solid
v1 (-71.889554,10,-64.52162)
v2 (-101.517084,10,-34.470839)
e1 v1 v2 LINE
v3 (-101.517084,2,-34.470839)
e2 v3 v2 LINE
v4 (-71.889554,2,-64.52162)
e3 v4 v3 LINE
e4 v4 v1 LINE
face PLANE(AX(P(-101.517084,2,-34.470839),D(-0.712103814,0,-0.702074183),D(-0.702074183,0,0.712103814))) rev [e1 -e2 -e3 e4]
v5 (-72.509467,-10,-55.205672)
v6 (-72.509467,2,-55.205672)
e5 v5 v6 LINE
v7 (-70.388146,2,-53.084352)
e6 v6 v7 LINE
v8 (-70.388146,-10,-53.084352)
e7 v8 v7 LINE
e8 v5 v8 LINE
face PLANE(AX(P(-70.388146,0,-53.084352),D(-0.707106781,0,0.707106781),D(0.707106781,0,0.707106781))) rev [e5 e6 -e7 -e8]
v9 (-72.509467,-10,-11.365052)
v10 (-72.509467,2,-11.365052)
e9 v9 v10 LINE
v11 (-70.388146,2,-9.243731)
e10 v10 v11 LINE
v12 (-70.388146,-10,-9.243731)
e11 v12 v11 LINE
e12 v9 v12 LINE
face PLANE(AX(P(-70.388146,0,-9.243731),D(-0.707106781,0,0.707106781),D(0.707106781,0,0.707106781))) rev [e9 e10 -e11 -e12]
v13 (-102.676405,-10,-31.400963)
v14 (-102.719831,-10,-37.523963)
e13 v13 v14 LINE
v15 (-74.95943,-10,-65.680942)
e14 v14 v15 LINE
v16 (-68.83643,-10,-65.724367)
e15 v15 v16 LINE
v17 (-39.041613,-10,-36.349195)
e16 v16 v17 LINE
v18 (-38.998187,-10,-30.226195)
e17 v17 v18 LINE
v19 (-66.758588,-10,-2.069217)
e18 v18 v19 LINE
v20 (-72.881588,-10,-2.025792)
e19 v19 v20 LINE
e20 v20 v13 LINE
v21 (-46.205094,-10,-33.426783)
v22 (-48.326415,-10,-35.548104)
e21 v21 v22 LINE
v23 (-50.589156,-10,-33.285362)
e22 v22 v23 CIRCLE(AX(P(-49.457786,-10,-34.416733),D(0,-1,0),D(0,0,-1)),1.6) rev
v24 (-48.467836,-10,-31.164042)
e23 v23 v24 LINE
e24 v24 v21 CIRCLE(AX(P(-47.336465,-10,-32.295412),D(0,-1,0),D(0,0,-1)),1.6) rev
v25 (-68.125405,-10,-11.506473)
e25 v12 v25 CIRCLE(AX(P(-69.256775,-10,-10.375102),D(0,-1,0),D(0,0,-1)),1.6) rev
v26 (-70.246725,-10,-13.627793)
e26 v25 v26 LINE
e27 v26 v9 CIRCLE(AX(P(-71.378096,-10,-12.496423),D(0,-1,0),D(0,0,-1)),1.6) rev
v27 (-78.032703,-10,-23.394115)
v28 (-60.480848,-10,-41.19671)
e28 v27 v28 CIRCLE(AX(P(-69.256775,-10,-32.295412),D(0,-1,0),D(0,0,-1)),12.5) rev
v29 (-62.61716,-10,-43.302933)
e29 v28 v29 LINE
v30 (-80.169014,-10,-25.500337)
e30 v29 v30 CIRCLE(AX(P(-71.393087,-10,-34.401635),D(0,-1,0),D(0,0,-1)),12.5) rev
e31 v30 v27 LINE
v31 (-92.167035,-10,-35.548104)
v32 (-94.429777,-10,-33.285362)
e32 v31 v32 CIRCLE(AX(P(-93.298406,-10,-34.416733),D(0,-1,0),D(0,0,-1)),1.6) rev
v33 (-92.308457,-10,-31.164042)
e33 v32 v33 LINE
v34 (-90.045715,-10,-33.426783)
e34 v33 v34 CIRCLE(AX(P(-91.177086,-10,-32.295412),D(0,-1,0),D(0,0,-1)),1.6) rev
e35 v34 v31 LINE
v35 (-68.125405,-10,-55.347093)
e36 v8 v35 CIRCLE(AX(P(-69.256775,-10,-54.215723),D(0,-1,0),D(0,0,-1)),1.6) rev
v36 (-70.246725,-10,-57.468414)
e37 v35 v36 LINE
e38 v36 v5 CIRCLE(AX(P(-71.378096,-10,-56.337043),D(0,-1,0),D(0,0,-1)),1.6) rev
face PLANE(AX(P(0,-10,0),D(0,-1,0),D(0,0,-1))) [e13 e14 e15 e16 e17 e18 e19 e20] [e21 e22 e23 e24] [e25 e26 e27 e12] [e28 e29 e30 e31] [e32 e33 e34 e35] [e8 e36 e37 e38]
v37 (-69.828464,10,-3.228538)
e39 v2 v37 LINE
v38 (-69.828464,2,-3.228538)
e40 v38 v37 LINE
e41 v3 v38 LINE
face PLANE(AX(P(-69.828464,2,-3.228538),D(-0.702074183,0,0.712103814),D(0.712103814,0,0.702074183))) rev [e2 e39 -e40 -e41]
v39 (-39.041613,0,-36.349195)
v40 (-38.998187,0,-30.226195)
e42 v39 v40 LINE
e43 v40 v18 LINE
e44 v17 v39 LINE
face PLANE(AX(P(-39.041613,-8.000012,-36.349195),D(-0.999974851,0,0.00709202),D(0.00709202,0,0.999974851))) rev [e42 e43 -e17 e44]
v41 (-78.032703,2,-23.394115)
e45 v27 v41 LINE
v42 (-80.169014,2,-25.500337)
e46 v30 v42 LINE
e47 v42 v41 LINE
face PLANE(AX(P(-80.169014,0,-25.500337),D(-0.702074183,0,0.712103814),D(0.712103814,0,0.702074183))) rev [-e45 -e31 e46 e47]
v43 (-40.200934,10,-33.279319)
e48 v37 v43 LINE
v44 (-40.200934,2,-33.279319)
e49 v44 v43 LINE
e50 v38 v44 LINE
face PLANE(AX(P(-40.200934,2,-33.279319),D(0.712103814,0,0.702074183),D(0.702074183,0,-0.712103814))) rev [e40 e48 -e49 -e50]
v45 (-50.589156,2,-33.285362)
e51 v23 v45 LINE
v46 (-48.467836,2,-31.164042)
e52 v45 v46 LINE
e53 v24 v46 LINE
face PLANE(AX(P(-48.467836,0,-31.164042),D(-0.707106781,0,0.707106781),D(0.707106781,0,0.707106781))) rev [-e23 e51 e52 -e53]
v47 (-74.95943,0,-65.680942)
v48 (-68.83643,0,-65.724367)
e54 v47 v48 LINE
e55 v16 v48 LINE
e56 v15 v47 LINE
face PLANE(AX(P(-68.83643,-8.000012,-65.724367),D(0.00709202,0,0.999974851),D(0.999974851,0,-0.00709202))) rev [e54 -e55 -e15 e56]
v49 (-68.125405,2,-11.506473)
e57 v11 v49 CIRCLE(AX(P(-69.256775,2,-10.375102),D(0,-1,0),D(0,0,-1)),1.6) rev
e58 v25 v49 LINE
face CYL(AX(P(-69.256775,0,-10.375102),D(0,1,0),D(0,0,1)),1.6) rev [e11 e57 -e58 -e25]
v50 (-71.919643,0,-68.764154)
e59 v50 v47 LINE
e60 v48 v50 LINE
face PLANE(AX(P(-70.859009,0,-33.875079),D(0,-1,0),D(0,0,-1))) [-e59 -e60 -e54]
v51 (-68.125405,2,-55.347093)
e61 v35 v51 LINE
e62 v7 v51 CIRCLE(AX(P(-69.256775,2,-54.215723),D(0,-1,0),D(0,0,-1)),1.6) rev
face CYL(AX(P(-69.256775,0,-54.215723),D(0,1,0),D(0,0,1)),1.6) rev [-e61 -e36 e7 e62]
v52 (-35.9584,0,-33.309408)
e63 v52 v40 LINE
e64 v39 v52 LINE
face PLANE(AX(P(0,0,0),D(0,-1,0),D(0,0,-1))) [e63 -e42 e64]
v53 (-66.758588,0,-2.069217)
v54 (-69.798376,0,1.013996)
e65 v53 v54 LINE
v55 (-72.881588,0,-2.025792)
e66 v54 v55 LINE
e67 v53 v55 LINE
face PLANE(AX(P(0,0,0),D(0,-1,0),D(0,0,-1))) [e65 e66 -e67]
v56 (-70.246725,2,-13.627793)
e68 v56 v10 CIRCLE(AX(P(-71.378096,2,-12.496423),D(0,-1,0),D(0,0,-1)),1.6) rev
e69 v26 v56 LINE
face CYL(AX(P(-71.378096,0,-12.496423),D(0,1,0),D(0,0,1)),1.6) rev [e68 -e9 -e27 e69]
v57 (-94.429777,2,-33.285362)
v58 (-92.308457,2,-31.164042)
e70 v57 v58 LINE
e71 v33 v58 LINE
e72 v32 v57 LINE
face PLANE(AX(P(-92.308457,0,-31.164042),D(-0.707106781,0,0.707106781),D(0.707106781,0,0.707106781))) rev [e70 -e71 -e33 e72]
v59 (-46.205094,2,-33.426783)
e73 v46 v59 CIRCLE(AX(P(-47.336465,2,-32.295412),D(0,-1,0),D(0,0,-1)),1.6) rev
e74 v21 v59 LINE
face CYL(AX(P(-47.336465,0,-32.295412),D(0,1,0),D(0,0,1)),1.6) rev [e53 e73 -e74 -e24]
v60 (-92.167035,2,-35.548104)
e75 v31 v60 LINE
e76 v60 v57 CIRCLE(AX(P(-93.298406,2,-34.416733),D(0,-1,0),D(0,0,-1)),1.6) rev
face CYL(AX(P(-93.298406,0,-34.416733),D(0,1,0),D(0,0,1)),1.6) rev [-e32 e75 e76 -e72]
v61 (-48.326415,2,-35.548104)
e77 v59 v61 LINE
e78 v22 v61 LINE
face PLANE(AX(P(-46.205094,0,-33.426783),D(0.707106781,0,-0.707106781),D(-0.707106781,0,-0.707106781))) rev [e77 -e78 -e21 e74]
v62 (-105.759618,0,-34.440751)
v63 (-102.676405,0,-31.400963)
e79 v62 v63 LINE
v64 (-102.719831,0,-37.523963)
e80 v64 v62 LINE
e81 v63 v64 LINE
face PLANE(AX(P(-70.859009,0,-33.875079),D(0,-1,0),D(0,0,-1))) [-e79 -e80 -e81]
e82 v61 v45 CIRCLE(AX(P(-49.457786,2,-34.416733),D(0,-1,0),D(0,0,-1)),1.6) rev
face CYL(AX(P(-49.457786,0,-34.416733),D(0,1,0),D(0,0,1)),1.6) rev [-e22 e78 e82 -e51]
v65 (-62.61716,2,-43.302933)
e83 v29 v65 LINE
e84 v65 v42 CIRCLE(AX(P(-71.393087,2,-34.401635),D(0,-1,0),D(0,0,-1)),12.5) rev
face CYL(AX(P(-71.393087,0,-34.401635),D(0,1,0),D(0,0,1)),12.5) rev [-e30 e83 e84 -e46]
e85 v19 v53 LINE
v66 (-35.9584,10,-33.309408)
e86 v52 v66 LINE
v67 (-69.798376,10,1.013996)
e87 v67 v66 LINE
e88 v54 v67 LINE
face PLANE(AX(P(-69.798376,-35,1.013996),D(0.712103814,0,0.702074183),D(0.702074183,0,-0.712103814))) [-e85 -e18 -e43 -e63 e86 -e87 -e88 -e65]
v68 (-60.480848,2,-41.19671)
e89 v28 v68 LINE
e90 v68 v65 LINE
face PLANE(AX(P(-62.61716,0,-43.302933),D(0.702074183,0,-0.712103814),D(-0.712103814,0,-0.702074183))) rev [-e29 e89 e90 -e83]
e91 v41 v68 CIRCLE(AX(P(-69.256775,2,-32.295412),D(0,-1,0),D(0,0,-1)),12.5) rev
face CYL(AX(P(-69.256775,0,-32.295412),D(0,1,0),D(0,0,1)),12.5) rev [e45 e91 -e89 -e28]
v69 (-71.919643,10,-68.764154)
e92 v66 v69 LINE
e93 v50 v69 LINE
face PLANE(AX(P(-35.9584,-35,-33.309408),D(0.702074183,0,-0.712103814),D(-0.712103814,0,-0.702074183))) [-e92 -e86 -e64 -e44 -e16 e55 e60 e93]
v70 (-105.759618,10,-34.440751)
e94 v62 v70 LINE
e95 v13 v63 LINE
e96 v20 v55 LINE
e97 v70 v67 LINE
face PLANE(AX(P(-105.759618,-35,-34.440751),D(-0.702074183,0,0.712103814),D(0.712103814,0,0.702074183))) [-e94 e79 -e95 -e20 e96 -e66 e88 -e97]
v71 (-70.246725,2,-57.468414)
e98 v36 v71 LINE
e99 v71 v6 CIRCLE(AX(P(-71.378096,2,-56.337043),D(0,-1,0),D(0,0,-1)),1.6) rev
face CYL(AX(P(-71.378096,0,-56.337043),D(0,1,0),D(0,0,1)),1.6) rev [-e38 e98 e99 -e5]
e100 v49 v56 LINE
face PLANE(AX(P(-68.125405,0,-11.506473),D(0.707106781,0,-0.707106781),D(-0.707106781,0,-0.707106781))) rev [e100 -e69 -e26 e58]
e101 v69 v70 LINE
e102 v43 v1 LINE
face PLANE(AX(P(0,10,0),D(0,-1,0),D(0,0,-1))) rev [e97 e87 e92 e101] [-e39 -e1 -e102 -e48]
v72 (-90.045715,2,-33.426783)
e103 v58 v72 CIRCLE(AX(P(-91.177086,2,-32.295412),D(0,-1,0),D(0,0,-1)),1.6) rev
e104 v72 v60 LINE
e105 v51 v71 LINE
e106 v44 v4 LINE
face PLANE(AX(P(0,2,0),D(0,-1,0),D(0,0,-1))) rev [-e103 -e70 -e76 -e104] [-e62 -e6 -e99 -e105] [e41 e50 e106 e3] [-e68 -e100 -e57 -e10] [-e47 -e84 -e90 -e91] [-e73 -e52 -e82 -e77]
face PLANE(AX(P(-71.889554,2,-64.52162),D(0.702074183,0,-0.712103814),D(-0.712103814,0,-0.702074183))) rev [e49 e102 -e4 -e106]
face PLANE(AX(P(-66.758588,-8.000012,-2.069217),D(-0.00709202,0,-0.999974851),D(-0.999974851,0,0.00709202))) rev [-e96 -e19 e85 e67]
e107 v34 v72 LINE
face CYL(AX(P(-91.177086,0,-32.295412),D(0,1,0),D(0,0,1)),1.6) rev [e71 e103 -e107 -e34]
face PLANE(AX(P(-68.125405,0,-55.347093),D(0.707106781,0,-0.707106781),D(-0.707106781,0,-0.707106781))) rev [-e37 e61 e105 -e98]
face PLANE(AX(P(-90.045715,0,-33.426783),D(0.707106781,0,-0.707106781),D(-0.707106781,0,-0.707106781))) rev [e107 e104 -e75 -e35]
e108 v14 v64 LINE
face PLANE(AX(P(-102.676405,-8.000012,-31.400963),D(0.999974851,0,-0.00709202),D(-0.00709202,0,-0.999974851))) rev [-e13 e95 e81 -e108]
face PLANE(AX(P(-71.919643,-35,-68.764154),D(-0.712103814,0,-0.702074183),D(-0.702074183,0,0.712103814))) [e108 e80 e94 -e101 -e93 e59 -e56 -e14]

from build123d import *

# Parameters (mm, degrees)
SKETCH1_W                  = 215
SKETCH1_H                  = 140
BOSS_EXTRUDE1_DEPTH        = 10
FILLET1_R                  = 60
SKETCH2_R                  = 20
SKETCH2_R_2                = 7.5
CUT_EXTRUDE1_DEPTH         = 129.671092325
CUT_EXTRUDE2_DEPTH         = 129.671092325
CUT_EXTRUDE3_DEPTH         = 129.671092325
SKETCH5_R                  = 11
CUT_EXTRUDE4_DEPTH         = 7
SKETCH6_R                  = 14
SKETCH6_R_2                = 11
BOSS_EXTRUDE2_DEPTH        = 8.5
SKETCH7_R                  = 23.5
CUT_EXTRUDE5_DEPTH         = 7
SKETCH8_R                  = 38.5
SKETCH8_R_2                = 30.5
BOSS_EXTRUDE3_DEPTH        = 8
BOSS_EXTRUDE4_DEPTH        = 35
BOSS_EXTRUDE5_DEPTH        = 8
CUT_EXTRUDE6_DEPTH         = 8
SKETCH12_R                 = 11
SKETCH12_R_2               = 7.5
BOSS_EXTRUDE6_DEPTH        = 0.5
BOSS_EXTRUDE7_REACH        = 137.946
SKETCH14_R                 = 2.05
CUT_EXTRUDE7_DEPTH         = 3.6
BOSS_EXTRUDE8_REACH        = 137.946
SKETCH16_R                 = 2.05
CUT_EXTRUDE8_START         = -3.6
CUT_EXTRUDE8_OUTLINE_R     = 2.05
CUT_EXTRUDE8_DEPTH         = 3.6
LPATTERN1_COUNT            = 3
LPATTERN1_PITCH            = 55
MIRROR2_COPY_1_REACH       = 137.946
MIRROR2_COPY_1_SKETCH_R    = 2.05
MIRROR2_COPY_2_REACH       = 137.946
MIRROR2_COPY_2_SKETCH_R    = 2.05
MIRROR2_START              = -3.6
MIRROR2_COPY_3_SKETCH_R    = 2.05
MIRROR2_COPY_3_DEPTH       = 3.6
MIRROR2_COPY_4_SKETCH_R    = 2.05
MIRROR2_COPY_4_DEPTH       = 3.6
BOSS_EXTRUDE9_REACH        = 137.946
SKETCH18_R                 = 2.05
CUT_EXTRUDE9_DEPTH         = 3.6
BOSS_EXTRUDE10_DEPTH       = 8
CUT_EXTRUDE10_DEPTH        = 133.97086147
SKETCH22_R                 = 1.6
CUT_EXTRUDE11_DEPTH        = 133.97086147
SKETCH23_R                 = 2.05
CUT_EXTRUDE12_DEPTH        = 133.97086147
CUT_EXTRUDE13_REACH        = 230.801
SKETCH24_R                 = 2.05
CROQUIS1_OUTSIDE_W         = 269.096
CROQUIS1_OUTSIDE_H         = 194.096
CORTAR_EXTRUIR1_DEPTH      = 136.945761243
CORTAR_EXTRUIR2_DEPTH      = 131.754479901
CORTAR_EXTRUIR2_DEPTH_BACK = 131.754479901
CROQUIS2_OUTSIDE_W         = 122.389
CROQUIS2_OUTSIDE_H         = 68.694
CROQUIS2_OUTSIDE_W_2       = 50.5
CROQUIS2_OUTSIDE_H_2       = 18
CORTAR_EXTRUIR3_DEPTH      = 128.426864322
CORTAR_EXTRUIR3_DEPTH_BACK = 8
CROQUIS3_OUTSIDE_W         = 91.868
CROQUIS3_OUTSIDE_H         = 91.844
SALIENTE_EXTRUIR1_DEPTH    = 2


# Read off the part's stored shape, not the designer's step: Cut-Extrude8
with BuildPart() as part:
    # Sketch1 → Boss-Extrude1 (new body)
    with BuildSketch(Plane(origin=(0, 0, 0), x_dir=(1, 0, 0), z_dir=(0, 1, 0))):
        Rectangle(SKETCH1_W, SKETCH1_H)
    extrude(amount=BOSS_EXTRUDE1_DEPTH)

    # Fillet1
    fillet1_edges = [part.edges().sort_by_distance(p)[0] for p in [
        (107.5, 5, 70),
        (107.5, 5, -70),
    ]]
    fillet(fillet1_edges, radius=FILLET1_R)

    # Sketch2 → Cut-Extrude1 (cut, through all)
    with BuildSketch(Plane(origin=(0, 10, 0), x_dir=(1, 0, 0), z_dir=(0, 1, 0))):
        with Locations(Location((42.5, 0, 0), (0, 0, 270))):
            Circle(SKETCH2_R)
        with Locations(Location((-36.5, 0, 0), (0, 0, 270))):
            Circle(SKETCH2_R_2)
    extrude(amount=-CUT_EXTRUDE1_DEPTH, mode=Mode.SUBTRACT)

    # Sketch3 → Cut-Extrude2 (cut, through all)
    with BuildSketch(Plane(origin=(0, 10, 0), x_dir=(1, 0, 0), z_dir=(0, 1, 0))):
        with BuildLine():
            Line((-62.6171596, 43.302932631), (-60.480848158, 41.196710083))
            ThreePointArc((-60.480848158, 41.196710083), (-60.355477768, 23.519485123), (-78.032702727, 23.394114734))
            Line((-78.032702727, 23.394114734), (-80.169014169, 25.500337282))
            ThreePointArc((-80.169014169, 25.500337282), (-80.294384559, 43.177562241), (-62.6171596, 43.302932631))
        make_face()
    extrude(amount=-CUT_EXTRUDE2_DEPTH, mode=Mode.SUBTRACT)

    # Sketch4 → Cut-Extrude3 (cut, through all)
    with BuildSketch(Plane(origin=(0, 10, 0), x_dir=(1, 0, 0), z_dir=(0, 1, 0))):
        with BuildLine():
            Line((-48.467836076, 31.164041558), (-50.589156419, 33.285361902))
            ThreePointArc((-50.589156419, 33.285361902), (-50.589156419, 35.548103602), (-48.326414719, 35.548103602))
            Line((-48.326414719, 35.548103602), (-46.205094376, 33.426783258))
            ThreePointArc((-46.205094376, 33.426783258), (-46.205094376, 31.164041558), (-48.467836076, 31.164041558))
        make_face()
        with BuildLine():
            Line((-70.388146292, 53.084351775), (-72.509466636, 55.205672119))
            ThreePointArc((-72.509466636, 55.205672119), (-72.509466636, 57.468413818), (-70.246724936, 57.468413818))
            Line((-70.246724936, 57.468413818), (-68.125404593, 55.347093475))
            ThreePointArc((-68.125404593, 55.347093475), (-68.125404593, 53.084351775), (-70.388146292, 53.084351775))
        make_face()
        with BuildLine():
            Line((-70.388146292, 9.243731341), (-72.509466636, 11.365051685))
            ThreePointArc((-72.509466636, 11.365051685), (-72.509466636, 13.627793385), (-70.246724936, 13.627793385))
            Line((-70.246724936, 13.627793385), (-68.125404593, 11.506473041))
            ThreePointArc((-68.125404593, 11.506473041), (-68.125404593, 9.243731341), (-70.388146292, 9.243731341))
        make_face()
        with BuildLine():
            Line((-92.308456509, 31.164041558), (-94.429776853, 33.285361902))
            ThreePointArc((-94.429776853, 33.285361902), (-94.429776853, 35.548103602), (-92.167035153, 35.548103602))
            Line((-92.167035153, 35.548103602), (-90.045714809, 33.426783258))
            ThreePointArc((-90.045714809, 33.426783258), (-90.045714809, 31.164041558), (-92.308456509, 31.164041558))
        make_face()
    extrude(amount=-CUT_EXTRUDE3_DEPTH, mode=Mode.SUBTRACT)

    # Sketch5 → Cut-Extrude4 (cut)
    with BuildSketch(Plane(origin=(0, 10, 0), x_dir=(1, 0, 0), z_dir=(0, 1, 0))):
        with Locations(Location((-36.5, 0, 0), (0, 0, 270))):
            Circle(SKETCH5_R)
    extrude(amount=-CUT_EXTRUDE4_DEPTH, mode=Mode.SUBTRACT)

    # Sketch6 → Boss-Extrude2 (add)
    with BuildSketch(Plane.XZ):
        with Locations(Location((-36.5, 0, 0), (0, 0, 270))):
            Circle(SKETCH6_R)
        with Locations(Location((-36.5, 0, 0), (0, 0, 90))):
            Circle(SKETCH6_R_2, mode=Mode.SUBTRACT)
    extrude(amount=BOSS_EXTRUDE2_DEPTH)

    # Sketch7 → Cut-Extrude5 (cut)
    with BuildSketch(Plane.XZ):
        with Locations(Location((42.5, 0, 0), (0, 0, 270))):
            Circle(SKETCH7_R)
    extrude(amount=-CUT_EXTRUDE5_DEPTH, mode=Mode.SUBTRACT)

    # Sketch8 → Boss-Extrude3 (add)
    with BuildSketch(Plane.XZ):
        with Locations(Location((42.5, 0, 0), (0, 0, 270))):
            Circle(SKETCH8_R)
        with Locations(Location((42.5, 0, 0), (0, 0, 270))):
            Circle(SKETCH8_R_2, mode=Mode.SUBTRACT)
    extrude(amount=BOSS_EXTRUDE3_DEPTH)

    # Sketch9 → Boss-Extrude4 (add)
    with BuildSketch(Plane.XZ):
        with BuildLine():
            Line((-107.5, -70), (47.5, -70))
            ThreePointArc((47.5, -70), (89.926406871, -52.426406871), (107.5, -10))
            Line((107.5, -10), (107.5, 10))
            ThreePointArc((107.5, 10), (89.926406871, 52.426406871), (47.5, 70))
            Line((47.5, 70), (-107.5, 70))
            Line((-107.5, 70), (-107.5, -70))
        make_face()
        with BuildLine():
            Line((47.5, 62), (-99.5, 62))
            Line((-99.5, 62), (-99.5, -62))
            Line((-99.5, -62), (47.5, -62))
            ThreePointArc((47.5, -62), (84.269552622, -46.769552622), (99.5, -10))
            Line((99.5, -10), (99.5, 10))
            ThreePointArc((99.5, 10), (84.269552622, 46.769552622), (47.5, 62))
        make_face(mode=Mode.SUBTRACT)
    extrude(amount=BOSS_EXTRUDE4_DEPTH)

    # Sketch10 → Boss-Extrude5 (add)
    with BuildSketch(Plane.XZ):
        with BuildLine():
            Line((-36.5, -14), (-36.5, -62))
            Line((-36.5, -62), (-99.5, -62))
            Line((-99.5, -62), (-99.5, 0))
            Line((-99.5, 0), (-50.5, 0))
            ThreePointArc((-50.5, 0), (-46.399494937, -9.899494937), (-36.5, -14))
        make_face()
        with BuildLine():
            Line((-80.169014169, -25.500337282), (-78.032702727, -23.394114734))
            ThreePointArc((-78.032702727, -23.394114734), (-60.355477768, -23.519485123), (-60.480848158, -41.196710083))
            Line((-60.480848158, -41.196710083), (-62.6171596, -43.302932631))
            ThreePointArc((-62.6171596, -43.302932631), (-80.294384559, -43.177562241), (-80.169014169, -25.500337282))
        make_face(mode=Mode.SUBTRACT)
        with BuildLine():
            Line((-94.429776853, -33.285361902), (-92.308456509, -31.164041558))
            ThreePointArc((-92.308456509, -31.164041558), (-90.045714809, -31.164041558), (-90.045714809, -33.426783258))
            Line((-90.045714809, -33.426783258), (-92.167035153, -35.548103602))
            ThreePointArc((-92.167035153, -35.548103602), (-94.429776853, -35.548103602), (-94.429776853, -33.285361902))
        make_face(mode=Mode.SUBTRACT)
        with BuildLine():
            Line((-68.125404593, -55.347093475), (-70.246724936, -57.468413818))
            ThreePointArc((-70.246724936, -57.468413818), (-72.509466636, -57.468413818), (-72.509466636, -55.205672119))
            Line((-72.509466636, -55.205672119), (-70.388146292, -53.084351775))
            ThreePointArc((-70.388146292, -53.084351775), (-68.125404593, -53.084351775), (-68.125404593, -55.347093475))
        make_face(mode=Mode.SUBTRACT)
        with BuildLine():
            Line((-46.205094376, -33.426783258), (-48.326414719, -35.548103602))
            ThreePointArc((-48.326414719, -35.548103602), (-50.589156419, -35.548103602), (-50.589156419, -33.285361902))
            Line((-50.589156419, -33.285361902), (-48.467836076, -31.164041558))
            ThreePointArc((-48.467836076, -31.164041558), (-46.205094376, -31.164041558), (-46.205094376, -33.426783258))
        make_face(mode=Mode.SUBTRACT)
        with BuildLine():
            Line((-68.125404593, -11.506473041), (-70.246724936, -13.627793385))
            ThreePointArc((-70.246724936, -13.627793385), (-72.509466636, -13.627793385), (-72.509466636, -11.365051685))
            Line((-72.509466636, -11.365051685), (-70.388146292, -9.243731341))
            ThreePointArc((-70.388146292, -9.243731341), (-68.125404593, -9.243731341), (-68.125404593, -11.506473041))
        make_face(mode=Mode.SUBTRACT)
    extrude(amount=BOSS_EXTRUDE5_DEPTH)

    # Sketch11 → Cut-Extrude6 (cut)
    with BuildSketch(Plane(origin=(0, 10, 0), x_dir=(1, 0, 0), z_dir=(0, 1, 0))):
        Polygon((-101.517084141, 34.470839412), (-71.889553628, 64.521620361), (-40.200933906, 33.279319227), (-69.82846442, 3.228538278), align=None)
    extrude(amount=-CUT_EXTRUDE6_DEPTH, mode=Mode.SUBTRACT)

    # Sketch12 → Boss-Extrude6 (add)
    with BuildSketch(Plane.XZ):
        with Locations(Location((-36.5, 0, 0), (0, 0, 90))):
            Circle(SKETCH12_R)
        with Locations(Location((-36.5, 0, 0), (0, 0, 90))):
            Circle(SKETCH12_R_2, mode=Mode.SUBTRACT)
    extrude(amount=BOSS_EXTRUDE6_DEPTH)

    # Sketch14 → Boss-Extrude7 (add, up to next)
    with BuildSketch(Plane.XZ.offset(35), mode=Mode.PRIVATE) as boss_extrude7_sk1:
        with BuildLine():
            Line((61.391194045, 60.110225783), (60.333474536, 57.556665))
            ThreePointArc((60.333474536, 57.556665), (63.337112892, 50.305240545), (70.588537347, 53.308878901))
            Line((70.588537347, 53.308878901), (71.711379603, 56.019659904))
            ThreePointArc((71.711379603, 56.019659904), (66.660759692, 58.341134534), (61.391194045, 60.110225783))
        make_face()
        with Locations(Location((65.461005942, 55.432771951, 0), (0, 0, 270))):
            Circle(SKETCH14_R, mode=Mode.SUBTRACT)
    boss_extrude7_tool1 = extrude(boss_extrude7_sk1.sketch, amount=-BOSS_EXTRUDE7_REACH, mode=Mode.PRIVATE) - part.part
    # Sketch14 → Boss-Extrude7 (add, up to next)
    with BuildSketch(Plane.XZ.offset(35), mode=Mode.PRIVATE) as boss_extrude7_sk2:
        with BuildLine():
            ThreePointArc((98.972980454, 17.3845977), (97.876725035, 22.891298414), (96.193134966, 28.247701421))
            Line((96.193134966, 28.247701421), (93.037240304, 26.94048705))
            ThreePointArc((93.037240304, 26.94048705), (90.033601948, 19.689062595), (97.285026403, 16.685424239))
            Line((97.285026403, 16.685424239), (98.972980454, 17.3845977))
        make_face()
        with Locations(Location((95.161133353, 21.812955645, 0), (0, 0, 270))):
            Circle(SKETCH14_R, mode=Mode.SUBTRACT)
    boss_extrude7_tool2 = extrude(boss_extrude7_sk2.sketch, amount=-BOSS_EXTRUDE7_REACH, mode=Mode.PRIVATE) - part.part
    boss_extrude7_1 = boss_extrude7_tool1.solids().sort_by_distance((61.006604, -35, 58.773687))[0]
    add(boss_extrude7_1)
    boss_extrude7_2 = boss_extrude7_tool2.solids().sort_by_distance((97.729394, -35, 22.853597))[0]
    add(boss_extrude7_2)
    boss_extrude7 = boss_extrude7_1 + boss_extrude7_2  # Boss-Extrude7 as one shape, for the pattern or mirror that repeats it

    # Sketch15 → Cut-Extrude7 (cut)
    with BuildSketch(Plane(origin=(0, -25, 0), x_dir=(-1, 0, 0), z_dir=(0, -1, 0))):
        with BuildLine():
            Line((-92.636291132, -16.870519833), (-98.459041258, -19.282381905))
            Line((-98.459041258, -19.282381905), (-99.00162845, -23.4037408))
            Line((-99.00162845, -23.4037408), (-95.703720545, -25.93431454))
            Line((-95.703720545, -25.93431454), (-89.880970419, -23.522452467))
            ThreePointArc((-89.880970419, -23.522452467), (-90.033601948, -19.689062595), (-92.636291132, -16.870519833))
        make_face()
        with BuildLine():
            Line((-67.170502764, -50.152609016), (-69.582364837, -55.975359143))
            Line((-69.582364837, -55.975359143), (-67.051791097, -59.273267048))
            Line((-67.051791097, -59.273267048), (-62.930432203, -58.730679856))
            Line((-62.930432203, -58.730679856), (-60.51857013, -52.907929729))
            ThreePointArc((-60.51857013, -52.907929729), (-63.337112892, -50.305240545), (-67.170502764, -50.152609016))
        make_face()
    cut_extrude7 = extrude(amount=-CUT_EXTRUDE7_DEPTH, mode=Mode.SUBTRACT)

    # Mirror1: Boss-Extrude7, Cut-Extrude7 across plane
    add(boss_extrude7.mirror(Plane.XY))
    add(cut_extrude7.mirror(Plane.XY), mode=Mode.SUBTRACT)

    # Sketch16 → Boss-Extrude8 (add, up to next)
    with BuildSketch(Plane.XZ.offset(35), mode=Mode.PRIVATE) as boss_extrude8_sk1:
        with BuildLine():
            Line((16.95, 59), (16.95, 62))
            Line((16.95, 62), (28.05, 62))
            Line((28.05, 62), (28.05, 59))
            ThreePointArc((28.05, 59), (22.5, 53.45), (16.95, 59))
        make_face()
        with Locations(Location((22.5, 59, 0), (0, 0, 270))):
            Circle(SKETCH16_R, mode=Mode.SUBTRACT)
    boss_extrude8_tool1 = extrude(boss_extrude8_sk1.sketch, amount=-BOSS_EXTRUDE8_REACH, mode=Mode.PRIVATE) - part.part
    boss_extrude8 = boss_extrude8_tool1.solids().sort_by_distance((17.090112, -35, 60.5))[0]
    add(boss_extrude8)

    # Cut-Extrude8 outline → Cut-Extrude8 (cut)
    with BuildSketch(Plane(origin=(0, -25, 0), x_dir=(-1, 0, 0), z_dir=(0, -1, 0)).offset(CUT_EXTRUDE8_START)):
        with BuildLine():
            Line((-22.5, -63.156921938), (-18.9, -61.078460969))
            Line((-18.9, -61.078460969), (-18.9, -54.775961648))
            ThreePointArc((-18.9, -54.775961648), (-22.5, -53.45), (-26.1, -54.775961648))
            Line((-26.1, -54.775961648), (-26.1, -61.078460969))
            Line((-26.1, -61.078460969), (-22.5, -63.156921938))
        make_face()
        with Locations((-22.5, -59)):
            Circle(CUT_EXTRUDE8_OUTLINE_R, mode=Mode.SUBTRACT)
    cut_extrude8 = extrude(amount=CUT_EXTRUDE8_DEPTH, mode=Mode.SUBTRACT)

    # LPattern1: Boss-Extrude8, Cut-Extrude8 ×3
    with Locations(*[(-i * LPATTERN1_PITCH, 0, 0) for i in range(1, LPATTERN1_COUNT)]):
        add(boss_extrude8)
        add(cut_extrude8, mode=Mode.SUBTRACT)

    # Mirror2: Boss-Extrude8, Cut-Extrude8 across plane
    add(boss_extrude8.mirror(Plane.XY))
    add(cut_extrude8.mirror(Plane.XY), mode=Mode.SUBTRACT)

    # Mirror2 copy 1 sketch → Mirror2 copy 1 (add, up to next)
    with BuildSketch(Plane(origin=(-55, -35, 0), x_dir=(1, 0, 0), z_dir=(0, -1, 0)), mode=Mode.PRIVATE) as mirror2_copy_1_sk1:
        with BuildLine():
            Line((16.95, -59), (16.95, -62))
            Line((16.95, -62), (28.05, -62))
            Line((28.05, -62), (28.05, -59))
            ThreePointArc((28.05, -59), (22.5, -53.45), (16.95, -59))
        make_face()
        with Locations((22.5, -59)):
            Circle(MIRROR2_COPY_1_SKETCH_R, mode=Mode.SUBTRACT)
    mirror2_copy_1_tool1 = extrude(mirror2_copy_1_sk1.sketch, amount=-MIRROR2_COPY_1_REACH, mode=Mode.PRIVATE) - part.part
    add(mirror2_copy_1_tool1.solids().sort_by_distance((-37.909888, -35, -60.5))[0])

    # Mirror2 copy 2 sketch → Mirror2 copy 2 (add, up to next)
    with BuildSketch(Plane(origin=(-110, -35, 0), x_dir=(1, 0, 0), z_dir=(0, -1, 0)), mode=Mode.PRIVATE) as mirror2_copy_2_sk1:
        with BuildLine():
            Line((16.95, -59), (16.95, -62))
            Line((16.95, -62), (28.05, -62))
            Line((28.05, -62), (28.05, -59))
            ThreePointArc((28.05, -59), (22.5, -53.45), (16.95, -59))
        make_face()
        with Locations((22.5, -59)):
            Circle(MIRROR2_COPY_2_SKETCH_R, mode=Mode.SUBTRACT)
    mirror2_copy_2_tool1 = extrude(mirror2_copy_2_sk1.sketch, amount=-MIRROR2_COPY_2_REACH, mode=Mode.PRIVATE) - part.part
    add(mirror2_copy_2_tool1.solids().sort_by_distance((-92.909888, -35, -60.5))[0])

    # Mirror2 copy 3 sketch → Mirror2 copy 3 (cut)
    with BuildSketch(Plane(origin=(-55, -25, 0), x_dir=(-1, 0, 0), z_dir=(0, -1, 0)).offset(MIRROR2_START)):
        with BuildLine():
            Line((-22.5, 63.156921938), (-18.9, 61.078460969))
            Line((-18.9, 61.078460969), (-18.9, 54.775961648))
            ThreePointArc((-18.9, 54.775961648), (-22.5, 53.45), (-26.1, 54.775961648))
            Line((-26.1, 54.775961648), (-26.1, 61.078460969))
            Line((-26.1, 61.078460969), (-22.5, 63.156921938))
        make_face()
        with Locations((-22.5, 59)):
            Circle(MIRROR2_COPY_3_SKETCH_R, mode=Mode.SUBTRACT)
    extrude(amount=MIRROR2_COPY_3_DEPTH, mode=Mode.SUBTRACT)

    # Mirror2 copy 4 sketch → Mirror2 copy 4 (cut)
    with BuildSketch(Plane(origin=(-110, -25, 0), x_dir=(-1, 0, 0), z_dir=(0, -1, 0)).offset(MIRROR2_START)):
        with BuildLine():
            Line((-22.5, 63.156921938), (-18.9, 61.078460969))
            Line((-18.9, 61.078460969), (-18.9, 54.775961648))
            ThreePointArc((-18.9, 54.775961648), (-22.5, 53.45), (-26.1, 54.775961648))
            Line((-26.1, 54.775961648), (-26.1, 61.078460969))
            Line((-26.1, 61.078460969), (-22.5, 63.156921938))
        make_face()
        with Locations((-22.5, 59)):
            Circle(MIRROR2_COPY_4_SKETCH_R, mode=Mode.SUBTRACT)
    extrude(amount=MIRROR2_COPY_4_DEPTH, mode=Mode.SUBTRACT)

    # Sketch18 → Boss-Extrude9 (add, up to next)
    with BuildSketch(Plane.XZ.offset(35), mode=Mode.PRIVATE) as boss_extrude9_sk1:
        with BuildLine():
            Line((-96.5, 28.55), (-99.5, 28.55))
            Line((-99.5, 28.55), (-99.5, 17.45))
            Line((-99.5, 17.45), (-96.5, 17.45))
            ThreePointArc((-96.5, 17.45), (-90.95, 23), (-96.5, 28.55))
        make_face()
        with Locations(Location((-96.5, 23, 0), (0, 0, 270))):
            Circle(SKETCH18_R, mode=Mode.SUBTRACT)
    boss_extrude9_tool1 = extrude(boss_extrude9_sk1.sketch, amount=-BOSS_EXTRUDE9_REACH, mode=Mode.PRIVATE) - part.part
    boss_extrude9 = boss_extrude9_tool1.solids().sort_by_distance((-98, -35, 28.409888))[0]
    add(boss_extrude9)

    # Sketch19 → Cut-Extrude9 (cut)
    with BuildSketch(Plane(origin=(0, -25, 0), x_dir=(-1, 0, 0), z_dir=(0, -1, 0))):
        with BuildLine():
            Line((98.578460969, -19.4), (92.275961648, -19.4))
            ThreePointArc((92.275961648, -19.4), (90.95, -23), (92.275961648, -26.6))
            Line((92.275961648, -26.6), (98.578460969, -26.6))
            Line((98.578460969, -26.6), (100.656921938, -23))
            Line((100.656921938, -23), (98.578460969, -19.4))
        make_face()
    cut_extrude9 = extrude(amount=-CUT_EXTRUDE9_DEPTH, mode=Mode.SUBTRACT)

    # Mirror3: Boss-Extrude9, Cut-Extrude9 across plane
    add(boss_extrude9.mirror(Plane.XY))
    add(cut_extrude9.mirror(Plane.XY), mode=Mode.SUBTRACT)

    # Sketch20 → Boss-Extrude10 (add)
    with BuildSketch(Plane.XZ):
        with BuildLine():
            Line((-25.156854249, 62), (12.595291742, 24.247854008))
            ThreePointArc((12.595291742, 24.247854008), (15.276388924, 27.223611076), (18.252145992, 29.904708258))
            Line((18.252145992, 29.904708258), (-13.843145751, 62))
            Line((-13.843145751, 62), (-25.156854249, 62))
        make_face()
        with BuildLine():
            Line((38.5, 62), (38.5, 38.291643997))
            ThreePointArc((38.5, 38.291643997), (42.5, 38.5), (46.5, 38.291643997))
            Line((46.5, 38.291643997), (46.5, 62))
            Line((46.5, 62), (38.5, 62))
        make_face()
        with BuildLine():
            Line((83.939658706, 47.096512955), (66.747854008, 29.904708258))
            ThreePointArc((66.747854008, 29.904708258), (69.723611076, 27.223611076), (72.404708258, 24.247854008))
            Line((72.404708258, 24.247854008), (89.209849092, 41.052994843))
            ThreePointArc((89.209849092, 41.052994843), (86.691420235, 44.176491627), (83.939658706, 47.096512955))
        make_face()
        with BuildLine():
            ThreePointArc((81, 0), (80.947875714, -2.002711426), (80.791643997, -4))
            Line((80.791643997, -4), (99.5, -4))
            Line((99.5, -4), (99.5, 4))
            Line((99.5, 4), (80.791643997, 4))
            ThreePointArc((80.791643997, 4), (80.947875714, 2.002711426), (81, 0))
        make_face()
        with BuildLine():
            ThreePointArc((72.404708258, -24.247854008), (69.723611076, -27.223611076), (66.747854008, -29.904708258))
            Line((66.747854008, -29.904708258), (83.939658706, -47.096512955))
            ThreePointArc((83.939658706, -47.096512955), (86.691420235, -44.176491627), (89.209849092, -41.052994843))
            Line((89.209849092, -41.052994843), (72.404708258, -24.247854008))
        make_face()
        with BuildLine():
            ThreePointArc((46.5, -38.291643997), (42.5, -38.5), (38.5, -38.291643997))
            Line((38.5, -38.291643997), (38.5, -62))
            Line((38.5, -62), (46.5, -62))
            Line((46.5, -62), (46.5, -38.291643997))
        make_face()
        with BuildLine():
            Line((12.595291742, -24.247854008), (-25.156854249, -62))
            Line((-25.156854249, -62), (-13.843145751, -62))
            Line((-13.843145751, -62), (18.252145992, -29.904708258))
            ThreePointArc((18.252145992, -29.904708258), (15.276388924, -27.223611076), (12.595291742, -24.247854008))
        make_face()
    extrude(amount=BOSS_EXTRUDE10_DEPTH)

    # Sketch21 → Cut-Extrude10 (cut, through all)
    with BuildSketch(Plane.XZ):
        with BuildLine():
            Line((-5, 12), (-5, 24))
            ThreePointArc((-5, 24), (-2.5, 26.5), (0, 24))
            Line((0, 24), (0, 12))
            ThreePointArc((0, 12), (-2.5, 9.5), (-5, 12))
        make_face()
        with BuildLine():
            Line((0, -12), (0, -24))
            ThreePointArc((0, -24), (-2.5, -26.5), (-5, -24))
            Line((-5, -24), (-5, -12))
            ThreePointArc((-5, -12), (-2.5, -9.5), (0, -12))
        make_face()
    extrude(amount=-CUT_EXTRUDE10_DEPTH, mode=Mode.SUBTRACT)

    # Sketch22 → Cut-Extrude11 (cut, through all)
    with BuildSketch(Plane.XZ):
        with Locations(Location((-5.5, -2, 0), (0, 0, 270))):
            Circle(SKETCH22_R)
        with Locations(Location((-13.888002132, 2.459979846, 0), (0, 0, 270))):
            Circle(SKETCH22_R)
    extrude(amount=-CUT_EXTRUDE11_DEPTH, mode=Mode.SUBTRACT)

    # Sketch23 → Cut-Extrude12 (cut, through all)
    with BuildSketch(Plane.XZ):
        with Locations(Location((-87.5, 8, 0), (0, 0, 270))):
            Circle(SKETCH23_R)
        with Locations(Location((-75.5, 8, 0), (0, 0, 270))):
            Circle(SKETCH23_R)
        with Locations(Location((-28.5, -36, 0), (0, 0, 270))):
            Circle(SKETCH23_R)
        with Locations(Location((-28.5, -48, 0), (0, 0, 270))):
            Circle(SKETCH23_R)
        with Locations(Location((-16.5, -42, 0), (0, 0, 270))):
            Circle(SKETCH23_R)
    extrude(amount=-CUT_EXTRUDE12_DEPTH, mode=Mode.SUBTRACT)

    # Sketch24 → Cut-Extrude13 (cut, up to next)
    with BuildSketch(Plane.ZY.offset(107.5), mode=Mode.PRIVATE) as cut_extrude13_sk1:
        with Locations((0, -27)):
            Circle(SKETCH24_R)
    cut_extrude13_tool1 = extrude(cut_extrude13_sk1.sketch, amount=-CUT_EXTRUDE13_REACH, mode=Mode.PRIVATE) & part.part
    # Sketch24 → Cut-Extrude13 (cut, up to next)
    with BuildSketch(Plane.ZY.offset(107.5), mode=Mode.PRIVATE) as cut_extrude13_sk2:
        with Locations((0, -13)):
            Circle(SKETCH24_R)
    cut_extrude13_tool2 = extrude(cut_extrude13_sk2.sketch, amount=-CUT_EXTRUDE13_REACH, mode=Mode.PRIVATE) & part.part
    # Sketch24 → Cut-Extrude13 (cut, up to next)
    with BuildSketch(Plane.ZY.offset(107.5), mode=Mode.PRIVATE) as cut_extrude13_sk3:
        with Locations((-50, -13)):
            Circle(SKETCH24_R)
    cut_extrude13_tool3 = extrude(cut_extrude13_sk3.sketch, amount=-CUT_EXTRUDE13_REACH, mode=Mode.PRIVATE) & part.part
    # Sketch24 → Cut-Extrude13 (cut, up to next)
    with BuildSketch(Plane.ZY.offset(107.5), mode=Mode.PRIVATE) as cut_extrude13_sk4:
        with Locations((-50, -27)):
            Circle(SKETCH24_R)
    cut_extrude13_tool4 = extrude(cut_extrude13_sk4.sketch, amount=-CUT_EXTRUDE13_REACH, mode=Mode.PRIVATE) & part.part
    # Sketch24 → Cut-Extrude13 (cut, up to next)
    with BuildSketch(Plane.ZY.offset(107.5), mode=Mode.PRIVATE) as cut_extrude13_sk5:
        with Locations((50, -13)):
            Circle(SKETCH24_R)
    cut_extrude13_tool5 = extrude(cut_extrude13_sk5.sketch, amount=-CUT_EXTRUDE13_REACH, mode=Mode.PRIVATE) & part.part
    # Sketch24 → Cut-Extrude13 (cut, up to next)
    with BuildSketch(Plane.ZY.offset(107.5), mode=Mode.PRIVATE) as cut_extrude13_sk6:
        with Locations((50, -27)):
            Circle(SKETCH24_R)
    cut_extrude13_tool6 = extrude(cut_extrude13_sk6.sketch, amount=-CUT_EXTRUDE13_REACH, mode=Mode.PRIVATE) & part.part
    add(cut_extrude13_tool1.solids().sort_by_distance((-107.5, -27, 0))[0], mode=Mode.SUBTRACT)
    add(cut_extrude13_tool2.solids().sort_by_distance((-107.5, -13, 0))[0], mode=Mode.SUBTRACT)
    add(cut_extrude13_tool3.solids().sort_by_distance((-107.5, -13, -50))[0], mode=Mode.SUBTRACT)
    add(cut_extrude13_tool4.solids().sort_by_distance((-107.5, -27, -50))[0], mode=Mode.SUBTRACT)
    add(cut_extrude13_tool5.solids().sort_by_distance((-107.5, -13, 50))[0], mode=Mode.SUBTRACT)
    add(cut_extrude13_tool6.solids().sort_by_distance((-107.5, -27, 50))[0], mode=Mode.SUBTRACT)

    # Croquis1 outside → Cortar-Extruir1 (cut, through all)
    with BuildSketch(Plane(origin=(0, 10, 0), x_dir=(1, 0, 0), z_dir=(0, 1, 0))):
        Rectangle(CROQUIS1_OUTSIDE_W, CROQUIS1_OUTSIDE_H)
        Polygon((-35.958399916, 33.309408121), (-71.919642521, 68.764154351), (-105.759618132, 34.440750518), (-69.798375526, -1.013995713), align=None, mode=Mode.SUBTRACT)
    extrude(amount=-CORTAR_EXTRUIR1_DEPTH, mode=Mode.SUBTRACT)

    # Croquis2 outside → Cortar-Extruir2 (cut, two sides: drawn at the far end of the back side and taken through both)
    with BuildSketch(Plane(origin=(-34.911135577, 0, 35.409866085), x_dir=(0.712103813967469, 0, 0.7020741827848282), z_dir=(-0.7020741827848282, 0, 0.712103813967469)).offset(-CORTAR_EXTRUIR2_DEPTH_BACK)):
        with Locations((-74.2415, -12.5)):
            Rectangle(CROQUIS2_OUTSIDE_W, CROQUIS2_OUTSIDE_H)
        with Locations((-74.24178921, 1)):
            Rectangle(CROQUIS2_OUTSIDE_W_2, CROQUIS2_OUTSIDE_H_2, mode=Mode.SUBTRACT)
    extrude(amount=CORTAR_EXTRUIR2_DEPTH + CORTAR_EXTRUIR2_DEPTH_BACK, mode=Mode.SUBTRACT)

    # Croquis3 outside → Cortar-Extruir3 (cut, two sides: drawn at the far end of the back side and taken through both)
    with BuildSketch(Plane.XZ.offset(8).offset(-CORTAR_EXTRUIR3_DEPTH_BACK)):
        with Locations((-70.859, -33.875)):
            Rectangle(CROQUIS3_OUTSIDE_W, CROQUIS3_OUTSIDE_H)
        Polygon((-74.959429756, -65.680941585), (-102.719830898, -37.523963284), (-102.676405366, -31.400963284), (-72.881588292, -2.025791521), (-66.758588292, -2.069217053), (-38.99818715, -30.226195355), (-39.041612682, -36.349195355), (-68.836429756, -65.724367117), align=None, mode=Mode.SUBTRACT)
    extrude(amount=CORTAR_EXTRUIR3_DEPTH + CORTAR_EXTRUIR3_DEPTH_BACK, mode=Mode.SUBTRACT)

    # Croquis7 → Saliente-Extruir1 (add)
    with BuildSketch(Plane.XZ.offset(8)):
        Polygon((-72.881588292, -2.025791521), (-102.676405366, -31.400963284), (-102.719830898, -37.523963284), (-74.959429756, -65.680941585), (-68.836429756, -65.724367117), (-39.041612682, -36.349195355), (-38.99818715, -30.226195355), (-66.758588292, -2.069217053), align=None)
        with BuildLine():
            ThreePointArc((-78.032702727, -23.394114734), (-60.355477768, -23.519485123), (-60.480848158, -41.196710083))
            Line((-60.480848158, -41.196710083), (-62.6171596, -43.302932631))
            ThreePointArc((-62.6171596, -43.302932631), (-80.294384559, -43.177562241), (-80.169014169, -25.500337282))
            Line((-80.169014169, -25.500337282), (-78.032702727, -23.394114734))
        make_face(mode=Mode.SUBTRACT)
        with BuildLine():
            ThreePointArc((-92.167035153, -35.548103602), (-94.429776853, -35.548103602), (-94.429776853, -33.285361902))
            Line((-94.429776853, -33.285361902), (-92.308456509, -31.164041558))
            ThreePointArc((-92.308456509, -31.164041558), (-90.045714809, -31.164041558), (-90.045714809, -33.426783258))
            Line((-90.045714809, -33.426783258), (-92.167035153, -35.548103602))
        make_face(mode=Mode.SUBTRACT)
        with BuildLine():
            ThreePointArc((-70.246724936, -57.468413818), (-72.509466636, -57.468413818), (-72.509466636, -55.205672119))
            Line((-72.509466636, -55.205672119), (-70.388146292, -53.084351775))
            ThreePointArc((-70.388146292, -53.084351775), (-68.125404593, -53.084351775), (-68.125404593, -55.347093475))
            Line((-68.125404593, -55.347093475), (-70.246724936, -57.468413818))
        make_face(mode=Mode.SUBTRACT)
        with BuildLine():
            ThreePointArc((-48.326414719, -35.548103602), (-50.589156419, -35.548103602), (-50.589156419, -33.285361902))
            Line((-50.589156419, -33.285361902), (-48.467836076, -31.164041558))
            ThreePointArc((-48.467836076, -31.164041558), (-46.205094376, -31.164041558), (-46.205094376, -33.426783258))
            Line((-46.205094376, -33.426783258), (-48.326414719, -35.548103602))
        make_face(mode=Mode.SUBTRACT)
        with BuildLine():
            ThreePointArc((-70.388146292, -9.243731341), (-68.125404593, -9.243731341), (-68.125404593, -11.506473041))
            Line((-68.125404593, -11.506473041), (-70.246724936, -13.627793385))
            ThreePointArc((-70.246724936, -13.627793385), (-72.509466636, -13.627793385), (-72.509466636, -11.365051685))
            Line((-72.509466636, -11.365051685), (-70.388146292, -9.243731341))
        make_face(mode=Mode.SUBTRACT)
    extrude(amount=SALIENTE_EXTRUIR1_DEPTH)


solid = part.part
